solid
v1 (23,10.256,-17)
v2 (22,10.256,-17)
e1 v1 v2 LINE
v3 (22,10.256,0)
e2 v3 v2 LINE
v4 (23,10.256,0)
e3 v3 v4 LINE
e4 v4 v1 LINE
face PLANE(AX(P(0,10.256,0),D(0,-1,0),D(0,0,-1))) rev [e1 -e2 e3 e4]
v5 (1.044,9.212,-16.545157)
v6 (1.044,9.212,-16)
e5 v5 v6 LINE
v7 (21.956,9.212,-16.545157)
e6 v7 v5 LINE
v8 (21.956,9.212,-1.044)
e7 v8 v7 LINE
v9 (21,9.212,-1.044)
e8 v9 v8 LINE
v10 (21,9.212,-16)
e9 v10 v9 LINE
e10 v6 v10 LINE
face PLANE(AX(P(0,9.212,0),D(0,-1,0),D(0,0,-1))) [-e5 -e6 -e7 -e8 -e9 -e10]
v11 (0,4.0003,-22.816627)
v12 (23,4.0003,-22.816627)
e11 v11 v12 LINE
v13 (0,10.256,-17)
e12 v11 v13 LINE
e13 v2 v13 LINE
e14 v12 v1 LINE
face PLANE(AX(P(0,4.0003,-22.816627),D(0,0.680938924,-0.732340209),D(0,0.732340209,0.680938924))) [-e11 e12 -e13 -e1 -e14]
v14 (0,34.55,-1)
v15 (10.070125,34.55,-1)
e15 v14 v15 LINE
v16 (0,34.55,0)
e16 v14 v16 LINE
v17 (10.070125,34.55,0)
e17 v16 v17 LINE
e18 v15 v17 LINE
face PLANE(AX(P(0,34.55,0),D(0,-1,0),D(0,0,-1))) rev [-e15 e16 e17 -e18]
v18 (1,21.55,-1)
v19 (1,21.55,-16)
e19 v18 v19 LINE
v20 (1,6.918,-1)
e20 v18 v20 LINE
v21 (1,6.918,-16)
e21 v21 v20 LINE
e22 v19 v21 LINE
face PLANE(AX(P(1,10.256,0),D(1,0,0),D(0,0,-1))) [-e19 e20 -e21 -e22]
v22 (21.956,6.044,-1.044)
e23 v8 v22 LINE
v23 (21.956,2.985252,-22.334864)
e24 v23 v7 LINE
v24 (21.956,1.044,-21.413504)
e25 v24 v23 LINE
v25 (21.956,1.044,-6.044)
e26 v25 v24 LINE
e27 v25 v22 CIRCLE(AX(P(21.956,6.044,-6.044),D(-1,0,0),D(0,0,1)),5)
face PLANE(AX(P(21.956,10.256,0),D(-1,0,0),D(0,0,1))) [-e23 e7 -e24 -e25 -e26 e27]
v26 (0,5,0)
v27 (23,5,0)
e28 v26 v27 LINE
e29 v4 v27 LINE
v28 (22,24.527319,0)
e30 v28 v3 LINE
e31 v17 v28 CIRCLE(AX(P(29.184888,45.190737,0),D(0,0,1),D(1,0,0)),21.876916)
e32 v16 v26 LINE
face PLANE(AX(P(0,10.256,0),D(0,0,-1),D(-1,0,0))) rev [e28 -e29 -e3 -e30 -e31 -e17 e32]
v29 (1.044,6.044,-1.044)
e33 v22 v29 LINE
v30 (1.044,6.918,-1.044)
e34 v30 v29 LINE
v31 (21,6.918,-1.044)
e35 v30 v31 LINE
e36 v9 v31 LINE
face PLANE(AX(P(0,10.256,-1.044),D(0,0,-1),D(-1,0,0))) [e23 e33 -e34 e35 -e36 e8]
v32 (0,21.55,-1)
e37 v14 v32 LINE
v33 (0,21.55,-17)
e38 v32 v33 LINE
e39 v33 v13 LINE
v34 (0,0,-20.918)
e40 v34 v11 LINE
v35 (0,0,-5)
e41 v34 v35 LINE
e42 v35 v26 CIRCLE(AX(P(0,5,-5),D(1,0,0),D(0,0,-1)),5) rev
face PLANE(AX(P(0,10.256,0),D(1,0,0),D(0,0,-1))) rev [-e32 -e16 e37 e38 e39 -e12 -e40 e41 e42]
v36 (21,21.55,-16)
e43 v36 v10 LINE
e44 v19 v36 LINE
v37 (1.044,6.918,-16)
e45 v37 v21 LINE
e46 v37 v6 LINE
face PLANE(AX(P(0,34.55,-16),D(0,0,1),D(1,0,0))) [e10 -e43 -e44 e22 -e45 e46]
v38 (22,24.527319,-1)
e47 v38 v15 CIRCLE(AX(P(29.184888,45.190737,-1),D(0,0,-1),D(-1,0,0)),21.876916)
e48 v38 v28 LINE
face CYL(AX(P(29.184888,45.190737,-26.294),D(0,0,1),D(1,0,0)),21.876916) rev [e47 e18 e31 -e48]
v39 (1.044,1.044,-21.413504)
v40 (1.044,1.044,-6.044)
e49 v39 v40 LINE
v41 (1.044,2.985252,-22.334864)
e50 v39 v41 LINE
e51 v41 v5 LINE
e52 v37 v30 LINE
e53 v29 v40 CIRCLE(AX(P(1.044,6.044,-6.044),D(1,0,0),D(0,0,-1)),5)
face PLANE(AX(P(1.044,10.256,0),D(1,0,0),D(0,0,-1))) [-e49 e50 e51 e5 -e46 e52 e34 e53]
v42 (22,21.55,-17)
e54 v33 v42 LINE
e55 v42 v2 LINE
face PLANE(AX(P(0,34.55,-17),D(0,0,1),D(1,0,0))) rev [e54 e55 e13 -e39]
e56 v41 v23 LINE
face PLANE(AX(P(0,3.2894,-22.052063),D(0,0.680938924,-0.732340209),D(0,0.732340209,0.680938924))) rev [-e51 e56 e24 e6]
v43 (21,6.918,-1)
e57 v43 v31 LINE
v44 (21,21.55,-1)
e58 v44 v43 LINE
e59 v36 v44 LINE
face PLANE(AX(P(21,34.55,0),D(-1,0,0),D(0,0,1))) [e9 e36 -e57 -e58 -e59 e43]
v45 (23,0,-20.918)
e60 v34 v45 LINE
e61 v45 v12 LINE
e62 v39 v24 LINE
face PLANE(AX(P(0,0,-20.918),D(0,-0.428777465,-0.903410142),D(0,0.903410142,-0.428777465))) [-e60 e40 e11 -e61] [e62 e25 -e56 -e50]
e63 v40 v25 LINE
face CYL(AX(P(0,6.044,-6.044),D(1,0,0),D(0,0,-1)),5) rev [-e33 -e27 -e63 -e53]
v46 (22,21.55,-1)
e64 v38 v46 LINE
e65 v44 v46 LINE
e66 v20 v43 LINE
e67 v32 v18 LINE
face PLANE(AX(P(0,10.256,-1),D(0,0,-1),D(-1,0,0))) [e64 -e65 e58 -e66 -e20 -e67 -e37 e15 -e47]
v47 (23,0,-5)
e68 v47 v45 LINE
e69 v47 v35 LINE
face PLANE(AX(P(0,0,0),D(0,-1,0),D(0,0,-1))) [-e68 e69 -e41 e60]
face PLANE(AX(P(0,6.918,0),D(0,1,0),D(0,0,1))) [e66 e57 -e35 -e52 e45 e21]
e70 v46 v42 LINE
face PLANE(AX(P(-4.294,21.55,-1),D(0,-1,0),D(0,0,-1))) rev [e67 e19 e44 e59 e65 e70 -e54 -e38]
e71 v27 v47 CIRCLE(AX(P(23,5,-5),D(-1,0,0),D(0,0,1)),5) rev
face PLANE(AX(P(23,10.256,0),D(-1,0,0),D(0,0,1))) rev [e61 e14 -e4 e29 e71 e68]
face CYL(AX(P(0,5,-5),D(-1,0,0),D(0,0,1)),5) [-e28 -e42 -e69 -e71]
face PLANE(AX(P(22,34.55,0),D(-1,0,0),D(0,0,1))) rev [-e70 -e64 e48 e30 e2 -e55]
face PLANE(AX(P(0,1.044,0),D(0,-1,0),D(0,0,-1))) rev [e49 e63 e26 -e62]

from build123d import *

# Parameters (mm, degrees)
SKETCH1_W           = 23
SKETCH1_H           = 17
BOSS_EXTRUDE1_DEPTH = 10.256
BOSS_EXTRUDE2_DEPTH = 23
SHELL1_T            = -1.044
SKETCH3_W           = 22
SKETCH3_H           = 17
BOSS_EXTRUDE3_DEPTH = 24.294
SHELL2_START        = 1
SHELL2_OUTLINE_W    = 24.338
SHELL2_OUTLINE_H    = 15
SHELL2_DEPTH        = 20
SKETCH4_W           = 20
SKETCH4_H           = 15
CUT_EXTRUDE1_DEPTH  = 3.294
SKETCH5_W           = 16
SKETCH5_H           = 13
CUT_EXTRUDE2_DEPTH  = 26.294
CUT_EXTRUDE3_DEPTH  = 26.294
FILLET1_R           = 5
FILLET2_R           = 5


# Read off the part's stored shape, not the designer's step: Shell2
with BuildPart() as part:
    # Sketch1 → Boss-Extrude1 (new body)
    with BuildSketch(Plane(origin=(0, 0, 0), x_dir=(1, 0, 0), z_dir=(0, 1, 0))):
        with Locations((11.5, 8.5)):
            Rectangle(SKETCH1_W, SKETCH1_H)
    extrude(amount=BOSS_EXTRUDE1_DEPTH)

    # Sketch2 → Boss-Extrude2 (add)
    with BuildSketch(Plane(origin=(23, 0, 0), x_dir=(0, 0, -1), z_dir=(1, 0, 0))):
        Polygon((17, 0), (20.918, 0), (22.816626616, 4.000300111), (17, 10.256), align=None)
    extrude(amount=-BOSS_EXTRUDE2_DEPTH)

    # Shell1
    shell1_openings = [part.faces().sort_by_distance(p)[0] for p in [
        (11.5, 2.000150055, -21.867313308),
    ]]
    offset(amount=SHELL1_T, openings=shell1_openings, kind=Kind.INTERSECTION)

    # Sketch3 → Boss-Extrude3 (add)
    with BuildSketch(Plane(origin=(0, 10.256, 0), x_dir=(1, 0, 0), z_dir=(0, 1, 0))):
        with Locations((11, 8.5)):
            Rectangle(SKETCH3_W, SKETCH3_H)
    extrude(amount=BOSS_EXTRUDE3_DEPTH)

    # Shell2 outline → Shell2 (cut)
    with BuildSketch(Plane.YZ.offset(SHELL2_START)):
        with Locations((22.381, -8.5)):
            Rectangle(SHELL2_OUTLINE_W, SHELL2_OUTLINE_H)
    extrude(amount=SHELL2_DEPTH, mode=Mode.SUBTRACT)

    # Sketch4 → Cut-Extrude1 (cut)
    with BuildSketch(Plane(origin=(0, 10.212, 0), x_dir=(1, 0, 0), z_dir=(0, 1, 0))):
        with Locations((11, 8.5)):
            Rectangle(SKETCH4_W, SKETCH4_H)
    extrude(amount=-CUT_EXTRUDE1_DEPTH, mode=Mode.SUBTRACT)

    # Sketch5 → Cut-Extrude2 (cut)
    with BuildSketch(Plane(origin=(22, 0, 0), x_dir=(0, 0, -1), z_dir=(1, 0, 0))):
        with Locations((9, 28.05)):
            Rectangle(SKETCH5_W, SKETCH5_H)
    extrude(amount=-CUT_EXTRUDE2_DEPTH, mode=Mode.SUBTRACT)

    # Sketch6 → Cut-Extrude3 (cut)
    with BuildSketch(Plane.XY):
        with BuildLine():
            Line((22, 34.55), (10.070124752, 34.55))
            ThreePointArc((10.070124752, 34.55), (15.112523328, 28.440572535), (22, 24.5273191))
            Line((22, 24.5273191), (22, 34.55))
        make_face()
    extrude(amount=-CUT_EXTRUDE3_DEPTH, mode=Mode.SUBTRACT)

    # Fillet1
    fillet1_edges = [part.edges().sort_by_distance(p)[0] for p in [
        (11.5, 0, 0),
    ]]
    fillet(fillet1_edges, radius=FILLET1_R)

    # Fillet2
    fillet2_edges = [part.edges().sort_by_distance(p)[0] for p in [
        (11.5, 1.044, -1.044),
    ]]
    fillet(fillet2_edges, radius=FILLET2_R)


solid = part.part
